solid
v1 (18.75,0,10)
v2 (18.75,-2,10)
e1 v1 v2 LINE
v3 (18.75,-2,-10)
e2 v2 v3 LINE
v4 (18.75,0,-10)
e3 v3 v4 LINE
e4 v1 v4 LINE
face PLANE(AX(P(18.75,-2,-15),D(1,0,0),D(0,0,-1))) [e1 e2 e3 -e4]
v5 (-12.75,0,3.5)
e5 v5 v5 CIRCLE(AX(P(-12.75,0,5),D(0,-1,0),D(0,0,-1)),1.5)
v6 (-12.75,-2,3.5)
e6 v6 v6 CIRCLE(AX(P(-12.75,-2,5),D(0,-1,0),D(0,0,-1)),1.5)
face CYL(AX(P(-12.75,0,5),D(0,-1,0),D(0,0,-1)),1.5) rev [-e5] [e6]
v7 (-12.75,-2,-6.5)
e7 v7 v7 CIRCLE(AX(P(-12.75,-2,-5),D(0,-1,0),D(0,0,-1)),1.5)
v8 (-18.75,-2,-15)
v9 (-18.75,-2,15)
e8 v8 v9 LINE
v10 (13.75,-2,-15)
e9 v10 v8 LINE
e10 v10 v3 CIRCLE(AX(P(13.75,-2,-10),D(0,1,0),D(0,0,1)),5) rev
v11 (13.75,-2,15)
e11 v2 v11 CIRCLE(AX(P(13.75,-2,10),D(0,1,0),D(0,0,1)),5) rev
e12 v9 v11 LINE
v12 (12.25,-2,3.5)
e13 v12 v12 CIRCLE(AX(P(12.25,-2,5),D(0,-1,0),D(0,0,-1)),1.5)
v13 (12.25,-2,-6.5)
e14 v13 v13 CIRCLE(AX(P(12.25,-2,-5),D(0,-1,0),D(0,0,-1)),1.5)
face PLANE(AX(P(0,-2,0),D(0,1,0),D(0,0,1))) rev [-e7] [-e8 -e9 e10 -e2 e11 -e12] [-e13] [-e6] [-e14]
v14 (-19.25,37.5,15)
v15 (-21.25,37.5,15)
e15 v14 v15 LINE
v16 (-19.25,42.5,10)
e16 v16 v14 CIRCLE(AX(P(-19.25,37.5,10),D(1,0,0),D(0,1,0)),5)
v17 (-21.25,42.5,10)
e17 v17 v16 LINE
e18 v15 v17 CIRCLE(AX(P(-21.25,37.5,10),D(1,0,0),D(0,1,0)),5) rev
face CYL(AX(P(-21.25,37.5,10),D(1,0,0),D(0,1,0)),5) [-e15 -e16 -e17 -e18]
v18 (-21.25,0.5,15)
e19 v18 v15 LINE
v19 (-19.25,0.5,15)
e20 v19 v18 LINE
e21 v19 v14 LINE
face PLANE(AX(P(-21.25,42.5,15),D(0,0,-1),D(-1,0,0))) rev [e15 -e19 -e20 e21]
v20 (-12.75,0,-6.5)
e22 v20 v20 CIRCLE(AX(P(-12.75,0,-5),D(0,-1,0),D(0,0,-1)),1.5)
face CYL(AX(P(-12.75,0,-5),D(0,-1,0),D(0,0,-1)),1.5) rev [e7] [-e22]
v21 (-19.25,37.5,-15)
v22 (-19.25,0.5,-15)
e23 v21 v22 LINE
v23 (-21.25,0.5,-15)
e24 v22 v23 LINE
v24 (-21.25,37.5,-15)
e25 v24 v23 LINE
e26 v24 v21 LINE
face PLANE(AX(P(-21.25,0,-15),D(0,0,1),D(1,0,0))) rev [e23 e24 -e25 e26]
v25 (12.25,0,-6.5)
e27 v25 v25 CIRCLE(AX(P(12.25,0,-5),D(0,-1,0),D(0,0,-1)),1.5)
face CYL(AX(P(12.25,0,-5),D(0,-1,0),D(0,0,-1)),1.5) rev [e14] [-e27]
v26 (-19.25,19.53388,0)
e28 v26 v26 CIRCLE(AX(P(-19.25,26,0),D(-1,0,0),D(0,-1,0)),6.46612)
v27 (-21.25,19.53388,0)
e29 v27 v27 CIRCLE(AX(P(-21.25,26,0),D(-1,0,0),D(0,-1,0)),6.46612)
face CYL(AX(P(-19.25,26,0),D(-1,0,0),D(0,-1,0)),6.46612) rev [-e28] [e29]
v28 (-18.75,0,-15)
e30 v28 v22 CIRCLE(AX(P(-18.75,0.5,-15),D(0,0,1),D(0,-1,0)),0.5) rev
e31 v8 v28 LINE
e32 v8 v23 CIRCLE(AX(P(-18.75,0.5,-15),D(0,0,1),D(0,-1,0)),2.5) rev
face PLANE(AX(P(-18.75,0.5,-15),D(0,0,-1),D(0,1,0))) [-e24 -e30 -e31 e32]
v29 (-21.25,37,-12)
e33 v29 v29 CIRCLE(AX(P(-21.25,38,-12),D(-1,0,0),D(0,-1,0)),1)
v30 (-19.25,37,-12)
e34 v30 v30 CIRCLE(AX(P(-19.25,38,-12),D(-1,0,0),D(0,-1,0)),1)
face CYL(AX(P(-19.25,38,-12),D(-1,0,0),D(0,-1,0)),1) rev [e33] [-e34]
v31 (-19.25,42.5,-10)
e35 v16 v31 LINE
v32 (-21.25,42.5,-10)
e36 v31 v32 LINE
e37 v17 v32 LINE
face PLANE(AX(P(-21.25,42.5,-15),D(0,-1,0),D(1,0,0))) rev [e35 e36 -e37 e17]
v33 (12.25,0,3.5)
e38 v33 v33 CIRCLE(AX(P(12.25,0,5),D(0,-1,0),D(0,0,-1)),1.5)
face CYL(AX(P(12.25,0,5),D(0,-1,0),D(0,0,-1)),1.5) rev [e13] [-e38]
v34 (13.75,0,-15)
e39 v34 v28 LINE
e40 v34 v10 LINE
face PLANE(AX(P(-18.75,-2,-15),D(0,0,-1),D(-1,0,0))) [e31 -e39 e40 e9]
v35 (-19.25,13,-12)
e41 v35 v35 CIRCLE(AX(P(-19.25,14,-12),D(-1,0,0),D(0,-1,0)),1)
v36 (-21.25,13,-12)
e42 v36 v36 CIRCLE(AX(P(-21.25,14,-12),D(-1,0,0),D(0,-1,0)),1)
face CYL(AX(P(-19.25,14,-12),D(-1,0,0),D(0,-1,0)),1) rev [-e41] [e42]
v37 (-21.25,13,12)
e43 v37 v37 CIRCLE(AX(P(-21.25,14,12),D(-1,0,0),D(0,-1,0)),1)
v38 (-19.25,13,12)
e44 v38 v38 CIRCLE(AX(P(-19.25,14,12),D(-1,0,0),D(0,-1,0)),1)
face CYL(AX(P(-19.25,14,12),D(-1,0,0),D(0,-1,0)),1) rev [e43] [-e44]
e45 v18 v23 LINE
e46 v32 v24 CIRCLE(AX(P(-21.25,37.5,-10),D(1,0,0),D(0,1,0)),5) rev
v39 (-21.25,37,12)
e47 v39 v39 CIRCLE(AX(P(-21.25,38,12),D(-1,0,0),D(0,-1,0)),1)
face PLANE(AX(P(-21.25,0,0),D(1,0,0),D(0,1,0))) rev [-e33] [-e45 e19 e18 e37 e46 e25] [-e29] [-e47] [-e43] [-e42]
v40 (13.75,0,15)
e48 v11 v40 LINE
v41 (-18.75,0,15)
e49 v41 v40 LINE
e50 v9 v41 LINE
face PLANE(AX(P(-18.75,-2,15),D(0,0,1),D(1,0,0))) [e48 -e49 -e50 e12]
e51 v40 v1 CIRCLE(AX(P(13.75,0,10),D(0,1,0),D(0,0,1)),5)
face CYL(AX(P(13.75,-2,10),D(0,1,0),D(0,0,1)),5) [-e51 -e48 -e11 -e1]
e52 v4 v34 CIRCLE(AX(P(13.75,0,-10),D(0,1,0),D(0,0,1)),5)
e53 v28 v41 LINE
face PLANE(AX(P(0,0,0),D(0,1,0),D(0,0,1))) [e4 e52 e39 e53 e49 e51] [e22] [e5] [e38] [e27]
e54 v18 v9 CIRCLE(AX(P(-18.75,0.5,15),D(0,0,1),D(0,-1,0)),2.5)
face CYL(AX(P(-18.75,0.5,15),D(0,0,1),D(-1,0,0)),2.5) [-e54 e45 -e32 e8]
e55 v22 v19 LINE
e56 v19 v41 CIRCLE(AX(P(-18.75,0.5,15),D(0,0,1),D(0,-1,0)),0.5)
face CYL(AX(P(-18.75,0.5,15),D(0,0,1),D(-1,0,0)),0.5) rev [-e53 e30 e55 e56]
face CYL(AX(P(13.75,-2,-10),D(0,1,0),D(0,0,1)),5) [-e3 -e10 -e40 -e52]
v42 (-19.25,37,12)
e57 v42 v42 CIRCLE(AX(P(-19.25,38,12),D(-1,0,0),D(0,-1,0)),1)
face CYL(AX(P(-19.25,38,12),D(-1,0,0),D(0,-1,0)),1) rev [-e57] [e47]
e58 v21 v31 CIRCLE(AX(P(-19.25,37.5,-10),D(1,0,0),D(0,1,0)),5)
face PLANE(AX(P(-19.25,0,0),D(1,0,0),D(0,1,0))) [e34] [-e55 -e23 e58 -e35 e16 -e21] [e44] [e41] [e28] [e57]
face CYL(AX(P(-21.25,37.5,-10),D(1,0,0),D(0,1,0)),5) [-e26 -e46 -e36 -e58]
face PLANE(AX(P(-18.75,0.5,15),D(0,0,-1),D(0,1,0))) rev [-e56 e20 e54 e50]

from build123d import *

# Parameters (mm, degrees)
CROQUIS1_W             = 37.5
CROQUIS1_H             = 30
BRIDA_BASE1_DEPTH      = 2
BRIDA_DE_ARISTA1_DEPTH = 30
CROQUIS9_R             = 1.5
CORTAR_EXTRUIR1_DEPTH  = 10
REDONDEO1_R            = 5
CROQUIS10_R            = 6.466120371
CROQUIS10_R_2          = 1
CORTAR_EXTRUIR2_DEPTH  = 2
REDONDEO2_R            = 5


# Sheet-metal steps are written as plain solids
with BuildPart() as part:
    # Croquis1 → Brida base1 (new body)
    with BuildSketch(Plane(origin=(0, 0, 0), x_dir=(1, 0, 0), z_dir=(0, 1, 0))):
        Rectangle(CROQUIS1_W, CROQUIS1_H)
    extrude(amount=-BRIDA_BASE1_DEPTH)

    # Brida de arista1 section (across the edge) → Brida de arista1 (add)
    with BuildSketch(Plane(origin=(-19.25, 0, -15), x_dir=(1, 0, 0), z_dir=(0, 0, 1))):
        with BuildLine():
            Line((-2, 0.5), (-2, 42.5))
            Line((-2, 42.5), (0, 42.5))
            Line((0, 42.5), (0, 0.5))
            ThreePointArc((0, 0.5), (0.146446609, 0.146446609), (0.5, 0))
            Line((0.5, 0), (0.5, -2))
            ThreePointArc((0.5, -2), (-1.267766953, -1.267766953), (-2, 0.5))
        make_face()
    extrude(amount=BRIDA_DE_ARISTA1_DEPTH)

    # Croquis9 → Cortar-Extruir1 (cut)
    with BuildSketch(Plane.XZ.offset(2)):
        with Locations(Location((-12.75, 5, 0), (0, 0, 270))):
            Circle(CROQUIS9_R)
        with Locations(Location((12.25, 5, 0), (0, 0, 270))):
            Circle(CROQUIS9_R)
        with Locations(Location((12.25, -5, 0), (0, 0, 270))):
            Circle(CROQUIS9_R)
        with Locations(Location((-12.75, -5, 0), (0, 0, 270))):
            Circle(CROQUIS9_R)
    extrude(amount=-CORTAR_EXTRUIR1_DEPTH, mode=Mode.SUBTRACT)

    # Redondeo1
    redondeo1_edges = [part.edges().sort_by_distance(p)[0] for p in [
        (18.75, -1, 15),
        (18.75, -1, -15),
    ]]
    fillet(redondeo1_edges, radius=REDONDEO1_R)

    # Croquis10 → Cortar-Extruir2 (cut)
    with BuildSketch(Plane.ZY.offset(21.25)):
        with Locations(Location((0, 26, 0), (0, 0, 270))):
            Circle(CROQUIS10_R)
        with Locations(Location((-12, 38, 0), (0, 0, 270))):
            Circle(CROQUIS10_R_2)
        with Locations(Location((12, 38, 0), (0, 0, 270))):
            Circle(CROQUIS10_R_2)
        with Locations(Location((12, 14, 0), (0, 0, 270))):
            Circle(CROQUIS10_R_2)
        with Locations(Location((-12, 14, 0), (0, 0, 270))):
            Circle(CROQUIS10_R_2)
    extrude(amount=-CORTAR_EXTRUIR2_DEPTH, mode=Mode.SUBTRACT)

    # Redondeo2
    redondeo2_edges = [part.edges().sort_by_distance(p)[0] for p in [
        (-20.25, 42.5, -15),
        (-20.25, 42.5, 15),
    ]]
    fillet(redondeo2_edges, radius=REDONDEO2_R)


solid = part.part
